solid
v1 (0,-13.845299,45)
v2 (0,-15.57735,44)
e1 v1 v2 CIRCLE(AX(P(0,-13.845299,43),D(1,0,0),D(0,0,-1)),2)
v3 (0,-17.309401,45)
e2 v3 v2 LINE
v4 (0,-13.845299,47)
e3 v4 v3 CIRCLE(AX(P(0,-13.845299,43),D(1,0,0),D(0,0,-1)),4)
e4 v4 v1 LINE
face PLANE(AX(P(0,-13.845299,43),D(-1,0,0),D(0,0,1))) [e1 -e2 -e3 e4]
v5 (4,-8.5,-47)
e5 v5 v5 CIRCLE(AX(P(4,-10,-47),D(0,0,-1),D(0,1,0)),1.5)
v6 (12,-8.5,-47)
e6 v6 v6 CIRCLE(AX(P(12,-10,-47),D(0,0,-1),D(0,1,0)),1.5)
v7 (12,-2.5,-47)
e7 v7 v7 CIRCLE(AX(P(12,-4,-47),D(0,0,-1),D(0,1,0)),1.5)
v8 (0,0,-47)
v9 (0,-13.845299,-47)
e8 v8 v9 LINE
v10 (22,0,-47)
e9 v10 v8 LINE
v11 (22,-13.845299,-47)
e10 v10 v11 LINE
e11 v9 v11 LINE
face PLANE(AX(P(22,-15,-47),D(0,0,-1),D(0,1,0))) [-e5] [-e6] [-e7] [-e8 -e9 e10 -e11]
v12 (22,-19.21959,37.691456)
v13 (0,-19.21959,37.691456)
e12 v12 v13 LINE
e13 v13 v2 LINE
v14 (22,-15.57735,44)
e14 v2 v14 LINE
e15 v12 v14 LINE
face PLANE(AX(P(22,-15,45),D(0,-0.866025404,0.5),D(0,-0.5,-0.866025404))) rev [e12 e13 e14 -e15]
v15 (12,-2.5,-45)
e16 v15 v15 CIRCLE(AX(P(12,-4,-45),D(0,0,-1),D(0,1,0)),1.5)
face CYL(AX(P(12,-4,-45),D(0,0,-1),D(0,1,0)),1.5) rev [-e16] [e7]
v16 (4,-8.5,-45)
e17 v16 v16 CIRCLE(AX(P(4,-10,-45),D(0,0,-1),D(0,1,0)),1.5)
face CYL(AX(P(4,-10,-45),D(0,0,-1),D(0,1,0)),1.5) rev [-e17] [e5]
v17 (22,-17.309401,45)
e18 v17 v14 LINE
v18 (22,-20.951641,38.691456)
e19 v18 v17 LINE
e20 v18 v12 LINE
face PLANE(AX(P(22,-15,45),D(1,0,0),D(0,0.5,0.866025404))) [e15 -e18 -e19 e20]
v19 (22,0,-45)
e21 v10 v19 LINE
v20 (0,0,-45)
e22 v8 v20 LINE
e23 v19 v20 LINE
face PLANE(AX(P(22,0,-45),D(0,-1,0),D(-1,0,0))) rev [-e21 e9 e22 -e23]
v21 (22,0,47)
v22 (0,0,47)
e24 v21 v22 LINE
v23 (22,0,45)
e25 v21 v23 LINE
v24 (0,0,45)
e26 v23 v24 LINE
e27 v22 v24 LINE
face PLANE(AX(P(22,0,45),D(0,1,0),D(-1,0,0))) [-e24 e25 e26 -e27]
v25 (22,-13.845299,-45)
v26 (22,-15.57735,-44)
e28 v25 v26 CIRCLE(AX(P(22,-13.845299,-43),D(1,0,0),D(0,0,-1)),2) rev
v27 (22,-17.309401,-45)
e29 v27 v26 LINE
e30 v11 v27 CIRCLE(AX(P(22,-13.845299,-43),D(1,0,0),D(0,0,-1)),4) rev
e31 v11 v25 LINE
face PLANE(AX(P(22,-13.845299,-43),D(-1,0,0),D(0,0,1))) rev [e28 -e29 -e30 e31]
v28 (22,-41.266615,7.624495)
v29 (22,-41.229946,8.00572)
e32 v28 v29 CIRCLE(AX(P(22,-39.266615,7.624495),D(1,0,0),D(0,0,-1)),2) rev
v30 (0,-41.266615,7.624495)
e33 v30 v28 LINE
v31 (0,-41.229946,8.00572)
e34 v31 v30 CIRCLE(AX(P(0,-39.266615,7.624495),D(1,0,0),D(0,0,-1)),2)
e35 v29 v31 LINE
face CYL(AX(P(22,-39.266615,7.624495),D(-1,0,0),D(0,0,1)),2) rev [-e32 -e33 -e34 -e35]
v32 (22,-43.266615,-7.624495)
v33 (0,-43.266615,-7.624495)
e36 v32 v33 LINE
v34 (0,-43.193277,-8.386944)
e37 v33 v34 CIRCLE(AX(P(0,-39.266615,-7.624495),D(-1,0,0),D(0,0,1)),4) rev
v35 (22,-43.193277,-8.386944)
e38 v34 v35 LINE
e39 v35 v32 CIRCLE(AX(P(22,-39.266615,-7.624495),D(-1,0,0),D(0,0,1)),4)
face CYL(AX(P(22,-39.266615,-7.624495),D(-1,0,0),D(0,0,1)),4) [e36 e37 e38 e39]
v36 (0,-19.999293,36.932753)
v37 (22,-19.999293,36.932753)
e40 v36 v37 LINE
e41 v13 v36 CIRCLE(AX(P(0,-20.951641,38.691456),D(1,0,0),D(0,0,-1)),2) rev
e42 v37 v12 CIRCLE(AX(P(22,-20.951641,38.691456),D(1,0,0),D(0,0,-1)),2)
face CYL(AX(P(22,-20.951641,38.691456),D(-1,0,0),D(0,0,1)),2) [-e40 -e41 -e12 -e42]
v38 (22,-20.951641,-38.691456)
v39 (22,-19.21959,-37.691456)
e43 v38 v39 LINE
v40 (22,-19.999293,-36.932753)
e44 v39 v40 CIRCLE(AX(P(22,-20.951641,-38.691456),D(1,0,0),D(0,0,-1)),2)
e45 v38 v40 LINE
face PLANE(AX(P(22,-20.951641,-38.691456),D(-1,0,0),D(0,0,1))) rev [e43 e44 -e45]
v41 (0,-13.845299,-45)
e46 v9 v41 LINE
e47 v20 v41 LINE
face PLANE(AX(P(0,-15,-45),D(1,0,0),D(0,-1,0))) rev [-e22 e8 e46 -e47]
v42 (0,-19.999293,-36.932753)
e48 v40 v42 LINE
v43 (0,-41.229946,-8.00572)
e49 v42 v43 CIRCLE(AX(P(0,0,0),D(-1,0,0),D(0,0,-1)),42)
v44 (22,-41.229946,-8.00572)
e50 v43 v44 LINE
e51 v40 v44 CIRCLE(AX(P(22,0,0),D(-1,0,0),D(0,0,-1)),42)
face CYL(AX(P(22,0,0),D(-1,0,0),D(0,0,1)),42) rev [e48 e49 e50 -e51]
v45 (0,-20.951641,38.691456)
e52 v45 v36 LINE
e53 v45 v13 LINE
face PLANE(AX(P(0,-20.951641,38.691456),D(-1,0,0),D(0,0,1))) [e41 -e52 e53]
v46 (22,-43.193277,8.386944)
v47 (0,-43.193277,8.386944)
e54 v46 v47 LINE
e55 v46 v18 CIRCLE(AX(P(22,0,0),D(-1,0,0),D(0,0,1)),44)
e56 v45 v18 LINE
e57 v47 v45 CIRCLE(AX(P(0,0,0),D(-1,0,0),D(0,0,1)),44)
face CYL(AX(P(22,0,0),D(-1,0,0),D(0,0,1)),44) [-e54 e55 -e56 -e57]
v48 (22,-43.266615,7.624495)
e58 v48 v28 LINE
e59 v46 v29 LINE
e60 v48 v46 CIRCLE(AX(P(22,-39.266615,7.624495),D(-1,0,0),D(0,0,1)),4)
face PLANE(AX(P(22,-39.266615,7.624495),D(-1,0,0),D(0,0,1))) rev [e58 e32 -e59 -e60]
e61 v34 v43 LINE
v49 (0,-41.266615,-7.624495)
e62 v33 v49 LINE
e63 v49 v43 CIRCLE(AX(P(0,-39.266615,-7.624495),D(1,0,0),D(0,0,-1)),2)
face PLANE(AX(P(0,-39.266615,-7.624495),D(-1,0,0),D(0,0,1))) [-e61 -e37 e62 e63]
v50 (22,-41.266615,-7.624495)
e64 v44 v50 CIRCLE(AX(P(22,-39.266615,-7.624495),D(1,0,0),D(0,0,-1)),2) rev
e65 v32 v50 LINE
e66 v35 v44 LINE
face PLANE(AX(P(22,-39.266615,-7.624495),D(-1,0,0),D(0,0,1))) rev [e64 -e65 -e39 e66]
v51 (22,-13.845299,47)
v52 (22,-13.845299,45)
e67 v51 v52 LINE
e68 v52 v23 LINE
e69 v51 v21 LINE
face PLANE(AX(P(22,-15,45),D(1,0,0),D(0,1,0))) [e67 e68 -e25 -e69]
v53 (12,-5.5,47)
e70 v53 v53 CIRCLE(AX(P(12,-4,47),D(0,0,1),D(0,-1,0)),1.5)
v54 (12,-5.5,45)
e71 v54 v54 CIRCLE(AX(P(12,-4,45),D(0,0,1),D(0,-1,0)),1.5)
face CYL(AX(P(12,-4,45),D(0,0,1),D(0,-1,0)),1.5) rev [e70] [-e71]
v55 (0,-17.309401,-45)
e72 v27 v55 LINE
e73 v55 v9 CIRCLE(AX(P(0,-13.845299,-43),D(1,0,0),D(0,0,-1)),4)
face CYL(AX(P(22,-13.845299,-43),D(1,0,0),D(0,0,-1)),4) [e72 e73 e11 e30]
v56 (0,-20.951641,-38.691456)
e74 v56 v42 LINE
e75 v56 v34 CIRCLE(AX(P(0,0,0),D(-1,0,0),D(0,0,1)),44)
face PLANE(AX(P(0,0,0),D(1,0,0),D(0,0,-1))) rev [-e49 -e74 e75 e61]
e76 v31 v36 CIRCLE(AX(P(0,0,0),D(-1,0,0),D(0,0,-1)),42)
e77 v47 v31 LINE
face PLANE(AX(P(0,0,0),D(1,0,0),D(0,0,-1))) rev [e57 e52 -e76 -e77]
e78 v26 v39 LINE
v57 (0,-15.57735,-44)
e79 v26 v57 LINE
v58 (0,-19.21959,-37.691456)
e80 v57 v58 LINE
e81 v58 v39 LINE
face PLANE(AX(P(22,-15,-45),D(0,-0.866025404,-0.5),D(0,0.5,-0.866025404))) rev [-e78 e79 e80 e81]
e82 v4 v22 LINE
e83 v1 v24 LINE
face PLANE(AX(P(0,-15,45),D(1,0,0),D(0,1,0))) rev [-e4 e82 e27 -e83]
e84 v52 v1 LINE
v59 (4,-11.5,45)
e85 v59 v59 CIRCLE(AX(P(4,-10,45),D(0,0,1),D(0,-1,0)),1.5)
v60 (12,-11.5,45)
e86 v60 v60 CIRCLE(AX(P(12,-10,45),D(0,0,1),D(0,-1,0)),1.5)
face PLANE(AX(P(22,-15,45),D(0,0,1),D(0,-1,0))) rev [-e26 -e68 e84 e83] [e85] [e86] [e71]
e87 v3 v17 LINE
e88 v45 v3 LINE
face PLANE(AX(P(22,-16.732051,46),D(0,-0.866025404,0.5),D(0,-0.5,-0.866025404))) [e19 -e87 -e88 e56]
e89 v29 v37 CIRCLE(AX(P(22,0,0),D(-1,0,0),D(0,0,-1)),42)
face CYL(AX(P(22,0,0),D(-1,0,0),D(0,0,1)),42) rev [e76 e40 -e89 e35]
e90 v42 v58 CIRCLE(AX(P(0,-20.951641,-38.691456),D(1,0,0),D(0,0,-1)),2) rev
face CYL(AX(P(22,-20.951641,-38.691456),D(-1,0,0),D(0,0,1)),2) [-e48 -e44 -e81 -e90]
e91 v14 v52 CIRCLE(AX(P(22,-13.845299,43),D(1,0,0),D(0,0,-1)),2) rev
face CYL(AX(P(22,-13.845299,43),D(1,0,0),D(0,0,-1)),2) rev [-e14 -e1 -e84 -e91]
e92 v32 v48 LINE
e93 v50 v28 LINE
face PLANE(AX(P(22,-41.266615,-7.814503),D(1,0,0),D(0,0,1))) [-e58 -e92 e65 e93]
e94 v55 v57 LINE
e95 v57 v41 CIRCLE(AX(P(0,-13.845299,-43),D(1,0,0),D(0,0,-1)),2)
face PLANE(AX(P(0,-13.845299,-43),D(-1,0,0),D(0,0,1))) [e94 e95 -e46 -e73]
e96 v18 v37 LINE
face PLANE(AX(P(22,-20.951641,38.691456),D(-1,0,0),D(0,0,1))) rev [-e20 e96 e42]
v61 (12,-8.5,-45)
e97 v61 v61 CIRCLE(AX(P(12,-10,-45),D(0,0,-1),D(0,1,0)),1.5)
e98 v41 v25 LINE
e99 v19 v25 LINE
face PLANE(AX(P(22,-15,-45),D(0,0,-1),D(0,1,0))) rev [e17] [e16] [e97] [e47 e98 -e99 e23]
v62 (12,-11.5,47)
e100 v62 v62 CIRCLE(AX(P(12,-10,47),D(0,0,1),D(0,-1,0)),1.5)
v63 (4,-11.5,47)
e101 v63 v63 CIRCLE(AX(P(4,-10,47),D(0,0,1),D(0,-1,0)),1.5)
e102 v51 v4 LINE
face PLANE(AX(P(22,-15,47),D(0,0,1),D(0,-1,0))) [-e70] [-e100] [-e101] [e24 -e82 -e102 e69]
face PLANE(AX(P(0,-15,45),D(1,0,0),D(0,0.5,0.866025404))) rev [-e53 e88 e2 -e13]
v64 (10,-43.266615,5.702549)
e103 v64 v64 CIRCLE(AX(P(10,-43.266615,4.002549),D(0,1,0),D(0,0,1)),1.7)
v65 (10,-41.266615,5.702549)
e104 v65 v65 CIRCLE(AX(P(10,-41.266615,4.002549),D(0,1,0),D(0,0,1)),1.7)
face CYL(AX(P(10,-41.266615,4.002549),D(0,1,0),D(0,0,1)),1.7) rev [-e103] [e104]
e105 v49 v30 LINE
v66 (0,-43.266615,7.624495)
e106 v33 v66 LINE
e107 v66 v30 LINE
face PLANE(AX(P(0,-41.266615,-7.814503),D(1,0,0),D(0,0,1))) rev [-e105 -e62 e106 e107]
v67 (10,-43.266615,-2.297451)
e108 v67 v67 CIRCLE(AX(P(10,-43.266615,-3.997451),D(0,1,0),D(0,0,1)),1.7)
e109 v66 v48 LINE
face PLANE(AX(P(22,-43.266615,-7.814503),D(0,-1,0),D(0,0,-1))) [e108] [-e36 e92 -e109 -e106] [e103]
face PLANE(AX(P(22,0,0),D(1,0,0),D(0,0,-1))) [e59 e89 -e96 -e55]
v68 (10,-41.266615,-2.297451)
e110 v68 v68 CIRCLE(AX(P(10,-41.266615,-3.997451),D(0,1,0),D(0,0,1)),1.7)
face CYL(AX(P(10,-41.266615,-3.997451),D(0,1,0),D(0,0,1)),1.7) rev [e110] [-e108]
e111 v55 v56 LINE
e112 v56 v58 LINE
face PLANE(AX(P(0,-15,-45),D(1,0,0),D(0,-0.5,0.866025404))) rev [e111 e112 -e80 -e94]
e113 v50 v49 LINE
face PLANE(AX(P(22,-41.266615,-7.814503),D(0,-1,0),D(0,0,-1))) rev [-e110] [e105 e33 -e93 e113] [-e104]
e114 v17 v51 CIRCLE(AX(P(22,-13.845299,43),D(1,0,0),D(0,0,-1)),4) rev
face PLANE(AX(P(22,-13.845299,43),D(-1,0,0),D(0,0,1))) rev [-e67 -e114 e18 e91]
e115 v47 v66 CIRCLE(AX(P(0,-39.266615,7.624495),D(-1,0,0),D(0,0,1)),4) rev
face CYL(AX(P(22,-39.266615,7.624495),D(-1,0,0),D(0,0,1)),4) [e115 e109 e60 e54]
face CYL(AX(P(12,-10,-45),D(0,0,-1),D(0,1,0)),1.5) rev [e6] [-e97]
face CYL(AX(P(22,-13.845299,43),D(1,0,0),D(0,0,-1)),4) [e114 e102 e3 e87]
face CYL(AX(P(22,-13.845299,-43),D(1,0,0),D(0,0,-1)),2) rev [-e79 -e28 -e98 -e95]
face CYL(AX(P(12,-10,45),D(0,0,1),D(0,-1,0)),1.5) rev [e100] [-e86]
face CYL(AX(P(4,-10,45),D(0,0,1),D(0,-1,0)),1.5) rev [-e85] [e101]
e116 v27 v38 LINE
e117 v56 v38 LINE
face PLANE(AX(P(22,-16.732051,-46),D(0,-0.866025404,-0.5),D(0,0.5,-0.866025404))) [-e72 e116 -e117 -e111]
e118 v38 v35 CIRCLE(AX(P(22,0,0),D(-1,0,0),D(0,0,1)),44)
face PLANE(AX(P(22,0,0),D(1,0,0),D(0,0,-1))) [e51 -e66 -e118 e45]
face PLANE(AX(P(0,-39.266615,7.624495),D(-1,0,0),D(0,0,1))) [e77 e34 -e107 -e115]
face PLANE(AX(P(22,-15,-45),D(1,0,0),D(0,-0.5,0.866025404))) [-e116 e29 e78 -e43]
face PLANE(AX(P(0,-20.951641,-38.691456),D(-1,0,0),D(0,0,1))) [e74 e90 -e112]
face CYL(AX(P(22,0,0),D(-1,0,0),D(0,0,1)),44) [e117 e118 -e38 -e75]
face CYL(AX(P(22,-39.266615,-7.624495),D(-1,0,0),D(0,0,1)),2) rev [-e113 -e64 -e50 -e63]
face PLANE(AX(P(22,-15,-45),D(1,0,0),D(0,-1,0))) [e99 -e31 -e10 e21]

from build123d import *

# Parameters (mm, degrees)
BOSS_EXTRUDE1_DEPTH   = 22
FILLET1_R             = 2
F_3_0MM_DOWEL_HOLE2_D = 3
CONVERT_SOLID1_DEPTH  = 22
M3_CLEARANCE_HOLE1_D  = 3.4


# Read off the part's stored shape, not the designer's step: Convert-Solid1
with BuildPart() as part:
    # Sketch1 → Boss-Extrude1 (new body)
    with BuildSketch(Plane(origin=(0, 0, 0), x_dir=(0, 0, -1), z_dir=(1, 0, 0))):
        with BuildLine():
            Line((-45, -15), (-37.195759655, -19.505780264))
            ThreePointArc((-37.195759655, -19.505780264), (-24.9972884, -33.75108254), (-7.814503261, -41.266615306))
            Line((-7.814503261, -41.266615306), (7.814503261, -41.266615306))
            ThreePointArc((7.814503261, -41.266615306), (24.9972884, -33.75108254), (37.195759655, -19.505780264))
            Line((37.195759655, -19.505780264), (45, -15))
            Line((45, -15), (45, 0))
            Line((45, 0), (47, 0))
            Line((47, 0), (47, -16.154700538))
            Line((47, -16.154700538), (38.691455747, -20.9516408))
            ThreePointArc((38.691455747, -20.9516408), (25.874940227, -35.587743231), (8, -43.266615306))
            Line((8, -43.266615306), (-8, -43.266615306))
            ThreePointArc((-8, -43.266615306), (-25.874940227, -35.587743231), (-38.691455747, -20.9516408))
            Line((-38.691455747, -20.9516408), (-47, -16.154700538))
            Line((-47, -16.154700538), (-47, 0))
            Line((-47, 0), (-45, 0))
            Line((-45, 0), (-45, -15))
        make_face()
    extrude(amount=BOSS_EXTRUDE1_DEPTH)

    # Fillet1
    fillet1_edges = [part.edges().sort_by_distance(p)[0] for p in [
        (11, -16.154700538, 47),
        (11, -15, 45),
        (11, -19.505780264, 37.195759655),
        (11, -41.266615306, 7.814503261),
        (11, -41.266615306, -7.814503261),
        (11, -19.505780264, -37.195759655),
        (11, -15, -45),
        (11, -16.154700538, -47),
        (11, -20.9516408, -38.691455747),
        (11, -43.266615306, -8),
        (11, -43.266615306, 8),
        (11, -20.9516408, 38.691455747),
    ]]
    fillet(fillet1_edges, radius=FILLET1_R)

    # Ø3.0mm Dowel Hole2 (through all)
    with Locations(Plane.XY.offset(47)):
        with Locations((4, -10), (12, -10), (12, -4)):
            Hole(F_3_0MM_DOWEL_HOLE2_D / 2)

    # Convert-Solid1 outline → Convert-Solid1 (cut)
    with BuildSketch(Plane.YZ):
        with BuildLine():
            ThreePointArc((-13.845299462, -47), (-15.845299462, -46.464101615), (-17.309401077, -45))
            Line((-17.309401077, -45), (-16.732050808, -46))
            ThreePointArc((-16.732050808, -46), (-16, -46.732050808), (-15, -47))
            Line((-15, -47), (-13.845299462, -47))
        make_face()
        with BuildLine():
            Line((-16.732050808, 46), (-17.309401077, 45))
            ThreePointArc((-17.309401077, 45), (-15.845299462, 46.464101615), (-13.845299462, 47))
            Line((-13.845299462, 47), (-15, 47))
            ThreePointArc((-15, 47), (-16, 46.732050808), (-16.732050808, 46))
        make_face()
        with BuildLine():
            ThreePointArc((-20.672392382, 39.175128193), (-21.000794949, 38.750427658), (-21.430336964, 38.428383489))
            ThreePointArc((-21.430336964, 38.428383489), (-21.191397112, 38.560662449), (-20.9516408, 38.691455747))
            Line((-20.9516408, 38.691455747), (-20.672392382, 39.175128193))
        make_face()
        with BuildLine():
            Line((-43.266615306, 7.814503261), (-43.266615306, 7.624494898))
            ThreePointArc((-43.266615306, 7.624494898), (-43.248238475, 8.007479152), (-43.193276836, 8.386944387))
            ThreePointArc((-43.193276836, 8.386944387), (-43.212600611, 8.286805686), (-43.231692225, 8.186622464))
            ThreePointArc((-43.231692225, 8.186622464), (-43.257865395, 8.001380442), (-43.266615306, 7.814503261))
        make_face()
        with BuildLine():
            ThreePointArc((-43.231692225, -8.186622464), (-43.212600611, -8.286805686), (-43.193276836, -8.386944387))
            ThreePointArc((-43.193276836, -8.386944387), (-43.248238475, -8.007479152), (-43.266615306, -7.624494898))
            Line((-43.266615306, -7.624494898), (-43.266615306, -7.814503261))
            ThreePointArc((-43.266615306, -7.814503261), (-43.257865395, -8.001380442), (-43.231692225, -8.186622464))
        make_face()
        with BuildLine():
            ThreePointArc((-21.430336964, -38.428383489), (-21.000794949, -38.750427658), (-20.672392382, -39.175128193))
            Line((-20.672392382, -39.175128193), (-20.9516408, -38.691455747))
            ThreePointArc((-20.9516408, -38.691455747), (-21.191397112, -38.560662449), (-21.430336964, -38.428383489))
        make_face()
    extrude(amount=CONVERT_SOLID1_DEPTH, mode=Mode.SUBTRACT)

    # M3 Clearance Hole1 (through all)
    with Locations(Plane(origin=(0, -41.266615306, 0), x_dir=(1, 0, 0), z_dir=(0, 1, 0))):
        with Locations((10, 3.99745139), (10, -4.00254861)):
            Hole(M3_CLEARANCE_HOLE1_D / 2)


solid = part.part
